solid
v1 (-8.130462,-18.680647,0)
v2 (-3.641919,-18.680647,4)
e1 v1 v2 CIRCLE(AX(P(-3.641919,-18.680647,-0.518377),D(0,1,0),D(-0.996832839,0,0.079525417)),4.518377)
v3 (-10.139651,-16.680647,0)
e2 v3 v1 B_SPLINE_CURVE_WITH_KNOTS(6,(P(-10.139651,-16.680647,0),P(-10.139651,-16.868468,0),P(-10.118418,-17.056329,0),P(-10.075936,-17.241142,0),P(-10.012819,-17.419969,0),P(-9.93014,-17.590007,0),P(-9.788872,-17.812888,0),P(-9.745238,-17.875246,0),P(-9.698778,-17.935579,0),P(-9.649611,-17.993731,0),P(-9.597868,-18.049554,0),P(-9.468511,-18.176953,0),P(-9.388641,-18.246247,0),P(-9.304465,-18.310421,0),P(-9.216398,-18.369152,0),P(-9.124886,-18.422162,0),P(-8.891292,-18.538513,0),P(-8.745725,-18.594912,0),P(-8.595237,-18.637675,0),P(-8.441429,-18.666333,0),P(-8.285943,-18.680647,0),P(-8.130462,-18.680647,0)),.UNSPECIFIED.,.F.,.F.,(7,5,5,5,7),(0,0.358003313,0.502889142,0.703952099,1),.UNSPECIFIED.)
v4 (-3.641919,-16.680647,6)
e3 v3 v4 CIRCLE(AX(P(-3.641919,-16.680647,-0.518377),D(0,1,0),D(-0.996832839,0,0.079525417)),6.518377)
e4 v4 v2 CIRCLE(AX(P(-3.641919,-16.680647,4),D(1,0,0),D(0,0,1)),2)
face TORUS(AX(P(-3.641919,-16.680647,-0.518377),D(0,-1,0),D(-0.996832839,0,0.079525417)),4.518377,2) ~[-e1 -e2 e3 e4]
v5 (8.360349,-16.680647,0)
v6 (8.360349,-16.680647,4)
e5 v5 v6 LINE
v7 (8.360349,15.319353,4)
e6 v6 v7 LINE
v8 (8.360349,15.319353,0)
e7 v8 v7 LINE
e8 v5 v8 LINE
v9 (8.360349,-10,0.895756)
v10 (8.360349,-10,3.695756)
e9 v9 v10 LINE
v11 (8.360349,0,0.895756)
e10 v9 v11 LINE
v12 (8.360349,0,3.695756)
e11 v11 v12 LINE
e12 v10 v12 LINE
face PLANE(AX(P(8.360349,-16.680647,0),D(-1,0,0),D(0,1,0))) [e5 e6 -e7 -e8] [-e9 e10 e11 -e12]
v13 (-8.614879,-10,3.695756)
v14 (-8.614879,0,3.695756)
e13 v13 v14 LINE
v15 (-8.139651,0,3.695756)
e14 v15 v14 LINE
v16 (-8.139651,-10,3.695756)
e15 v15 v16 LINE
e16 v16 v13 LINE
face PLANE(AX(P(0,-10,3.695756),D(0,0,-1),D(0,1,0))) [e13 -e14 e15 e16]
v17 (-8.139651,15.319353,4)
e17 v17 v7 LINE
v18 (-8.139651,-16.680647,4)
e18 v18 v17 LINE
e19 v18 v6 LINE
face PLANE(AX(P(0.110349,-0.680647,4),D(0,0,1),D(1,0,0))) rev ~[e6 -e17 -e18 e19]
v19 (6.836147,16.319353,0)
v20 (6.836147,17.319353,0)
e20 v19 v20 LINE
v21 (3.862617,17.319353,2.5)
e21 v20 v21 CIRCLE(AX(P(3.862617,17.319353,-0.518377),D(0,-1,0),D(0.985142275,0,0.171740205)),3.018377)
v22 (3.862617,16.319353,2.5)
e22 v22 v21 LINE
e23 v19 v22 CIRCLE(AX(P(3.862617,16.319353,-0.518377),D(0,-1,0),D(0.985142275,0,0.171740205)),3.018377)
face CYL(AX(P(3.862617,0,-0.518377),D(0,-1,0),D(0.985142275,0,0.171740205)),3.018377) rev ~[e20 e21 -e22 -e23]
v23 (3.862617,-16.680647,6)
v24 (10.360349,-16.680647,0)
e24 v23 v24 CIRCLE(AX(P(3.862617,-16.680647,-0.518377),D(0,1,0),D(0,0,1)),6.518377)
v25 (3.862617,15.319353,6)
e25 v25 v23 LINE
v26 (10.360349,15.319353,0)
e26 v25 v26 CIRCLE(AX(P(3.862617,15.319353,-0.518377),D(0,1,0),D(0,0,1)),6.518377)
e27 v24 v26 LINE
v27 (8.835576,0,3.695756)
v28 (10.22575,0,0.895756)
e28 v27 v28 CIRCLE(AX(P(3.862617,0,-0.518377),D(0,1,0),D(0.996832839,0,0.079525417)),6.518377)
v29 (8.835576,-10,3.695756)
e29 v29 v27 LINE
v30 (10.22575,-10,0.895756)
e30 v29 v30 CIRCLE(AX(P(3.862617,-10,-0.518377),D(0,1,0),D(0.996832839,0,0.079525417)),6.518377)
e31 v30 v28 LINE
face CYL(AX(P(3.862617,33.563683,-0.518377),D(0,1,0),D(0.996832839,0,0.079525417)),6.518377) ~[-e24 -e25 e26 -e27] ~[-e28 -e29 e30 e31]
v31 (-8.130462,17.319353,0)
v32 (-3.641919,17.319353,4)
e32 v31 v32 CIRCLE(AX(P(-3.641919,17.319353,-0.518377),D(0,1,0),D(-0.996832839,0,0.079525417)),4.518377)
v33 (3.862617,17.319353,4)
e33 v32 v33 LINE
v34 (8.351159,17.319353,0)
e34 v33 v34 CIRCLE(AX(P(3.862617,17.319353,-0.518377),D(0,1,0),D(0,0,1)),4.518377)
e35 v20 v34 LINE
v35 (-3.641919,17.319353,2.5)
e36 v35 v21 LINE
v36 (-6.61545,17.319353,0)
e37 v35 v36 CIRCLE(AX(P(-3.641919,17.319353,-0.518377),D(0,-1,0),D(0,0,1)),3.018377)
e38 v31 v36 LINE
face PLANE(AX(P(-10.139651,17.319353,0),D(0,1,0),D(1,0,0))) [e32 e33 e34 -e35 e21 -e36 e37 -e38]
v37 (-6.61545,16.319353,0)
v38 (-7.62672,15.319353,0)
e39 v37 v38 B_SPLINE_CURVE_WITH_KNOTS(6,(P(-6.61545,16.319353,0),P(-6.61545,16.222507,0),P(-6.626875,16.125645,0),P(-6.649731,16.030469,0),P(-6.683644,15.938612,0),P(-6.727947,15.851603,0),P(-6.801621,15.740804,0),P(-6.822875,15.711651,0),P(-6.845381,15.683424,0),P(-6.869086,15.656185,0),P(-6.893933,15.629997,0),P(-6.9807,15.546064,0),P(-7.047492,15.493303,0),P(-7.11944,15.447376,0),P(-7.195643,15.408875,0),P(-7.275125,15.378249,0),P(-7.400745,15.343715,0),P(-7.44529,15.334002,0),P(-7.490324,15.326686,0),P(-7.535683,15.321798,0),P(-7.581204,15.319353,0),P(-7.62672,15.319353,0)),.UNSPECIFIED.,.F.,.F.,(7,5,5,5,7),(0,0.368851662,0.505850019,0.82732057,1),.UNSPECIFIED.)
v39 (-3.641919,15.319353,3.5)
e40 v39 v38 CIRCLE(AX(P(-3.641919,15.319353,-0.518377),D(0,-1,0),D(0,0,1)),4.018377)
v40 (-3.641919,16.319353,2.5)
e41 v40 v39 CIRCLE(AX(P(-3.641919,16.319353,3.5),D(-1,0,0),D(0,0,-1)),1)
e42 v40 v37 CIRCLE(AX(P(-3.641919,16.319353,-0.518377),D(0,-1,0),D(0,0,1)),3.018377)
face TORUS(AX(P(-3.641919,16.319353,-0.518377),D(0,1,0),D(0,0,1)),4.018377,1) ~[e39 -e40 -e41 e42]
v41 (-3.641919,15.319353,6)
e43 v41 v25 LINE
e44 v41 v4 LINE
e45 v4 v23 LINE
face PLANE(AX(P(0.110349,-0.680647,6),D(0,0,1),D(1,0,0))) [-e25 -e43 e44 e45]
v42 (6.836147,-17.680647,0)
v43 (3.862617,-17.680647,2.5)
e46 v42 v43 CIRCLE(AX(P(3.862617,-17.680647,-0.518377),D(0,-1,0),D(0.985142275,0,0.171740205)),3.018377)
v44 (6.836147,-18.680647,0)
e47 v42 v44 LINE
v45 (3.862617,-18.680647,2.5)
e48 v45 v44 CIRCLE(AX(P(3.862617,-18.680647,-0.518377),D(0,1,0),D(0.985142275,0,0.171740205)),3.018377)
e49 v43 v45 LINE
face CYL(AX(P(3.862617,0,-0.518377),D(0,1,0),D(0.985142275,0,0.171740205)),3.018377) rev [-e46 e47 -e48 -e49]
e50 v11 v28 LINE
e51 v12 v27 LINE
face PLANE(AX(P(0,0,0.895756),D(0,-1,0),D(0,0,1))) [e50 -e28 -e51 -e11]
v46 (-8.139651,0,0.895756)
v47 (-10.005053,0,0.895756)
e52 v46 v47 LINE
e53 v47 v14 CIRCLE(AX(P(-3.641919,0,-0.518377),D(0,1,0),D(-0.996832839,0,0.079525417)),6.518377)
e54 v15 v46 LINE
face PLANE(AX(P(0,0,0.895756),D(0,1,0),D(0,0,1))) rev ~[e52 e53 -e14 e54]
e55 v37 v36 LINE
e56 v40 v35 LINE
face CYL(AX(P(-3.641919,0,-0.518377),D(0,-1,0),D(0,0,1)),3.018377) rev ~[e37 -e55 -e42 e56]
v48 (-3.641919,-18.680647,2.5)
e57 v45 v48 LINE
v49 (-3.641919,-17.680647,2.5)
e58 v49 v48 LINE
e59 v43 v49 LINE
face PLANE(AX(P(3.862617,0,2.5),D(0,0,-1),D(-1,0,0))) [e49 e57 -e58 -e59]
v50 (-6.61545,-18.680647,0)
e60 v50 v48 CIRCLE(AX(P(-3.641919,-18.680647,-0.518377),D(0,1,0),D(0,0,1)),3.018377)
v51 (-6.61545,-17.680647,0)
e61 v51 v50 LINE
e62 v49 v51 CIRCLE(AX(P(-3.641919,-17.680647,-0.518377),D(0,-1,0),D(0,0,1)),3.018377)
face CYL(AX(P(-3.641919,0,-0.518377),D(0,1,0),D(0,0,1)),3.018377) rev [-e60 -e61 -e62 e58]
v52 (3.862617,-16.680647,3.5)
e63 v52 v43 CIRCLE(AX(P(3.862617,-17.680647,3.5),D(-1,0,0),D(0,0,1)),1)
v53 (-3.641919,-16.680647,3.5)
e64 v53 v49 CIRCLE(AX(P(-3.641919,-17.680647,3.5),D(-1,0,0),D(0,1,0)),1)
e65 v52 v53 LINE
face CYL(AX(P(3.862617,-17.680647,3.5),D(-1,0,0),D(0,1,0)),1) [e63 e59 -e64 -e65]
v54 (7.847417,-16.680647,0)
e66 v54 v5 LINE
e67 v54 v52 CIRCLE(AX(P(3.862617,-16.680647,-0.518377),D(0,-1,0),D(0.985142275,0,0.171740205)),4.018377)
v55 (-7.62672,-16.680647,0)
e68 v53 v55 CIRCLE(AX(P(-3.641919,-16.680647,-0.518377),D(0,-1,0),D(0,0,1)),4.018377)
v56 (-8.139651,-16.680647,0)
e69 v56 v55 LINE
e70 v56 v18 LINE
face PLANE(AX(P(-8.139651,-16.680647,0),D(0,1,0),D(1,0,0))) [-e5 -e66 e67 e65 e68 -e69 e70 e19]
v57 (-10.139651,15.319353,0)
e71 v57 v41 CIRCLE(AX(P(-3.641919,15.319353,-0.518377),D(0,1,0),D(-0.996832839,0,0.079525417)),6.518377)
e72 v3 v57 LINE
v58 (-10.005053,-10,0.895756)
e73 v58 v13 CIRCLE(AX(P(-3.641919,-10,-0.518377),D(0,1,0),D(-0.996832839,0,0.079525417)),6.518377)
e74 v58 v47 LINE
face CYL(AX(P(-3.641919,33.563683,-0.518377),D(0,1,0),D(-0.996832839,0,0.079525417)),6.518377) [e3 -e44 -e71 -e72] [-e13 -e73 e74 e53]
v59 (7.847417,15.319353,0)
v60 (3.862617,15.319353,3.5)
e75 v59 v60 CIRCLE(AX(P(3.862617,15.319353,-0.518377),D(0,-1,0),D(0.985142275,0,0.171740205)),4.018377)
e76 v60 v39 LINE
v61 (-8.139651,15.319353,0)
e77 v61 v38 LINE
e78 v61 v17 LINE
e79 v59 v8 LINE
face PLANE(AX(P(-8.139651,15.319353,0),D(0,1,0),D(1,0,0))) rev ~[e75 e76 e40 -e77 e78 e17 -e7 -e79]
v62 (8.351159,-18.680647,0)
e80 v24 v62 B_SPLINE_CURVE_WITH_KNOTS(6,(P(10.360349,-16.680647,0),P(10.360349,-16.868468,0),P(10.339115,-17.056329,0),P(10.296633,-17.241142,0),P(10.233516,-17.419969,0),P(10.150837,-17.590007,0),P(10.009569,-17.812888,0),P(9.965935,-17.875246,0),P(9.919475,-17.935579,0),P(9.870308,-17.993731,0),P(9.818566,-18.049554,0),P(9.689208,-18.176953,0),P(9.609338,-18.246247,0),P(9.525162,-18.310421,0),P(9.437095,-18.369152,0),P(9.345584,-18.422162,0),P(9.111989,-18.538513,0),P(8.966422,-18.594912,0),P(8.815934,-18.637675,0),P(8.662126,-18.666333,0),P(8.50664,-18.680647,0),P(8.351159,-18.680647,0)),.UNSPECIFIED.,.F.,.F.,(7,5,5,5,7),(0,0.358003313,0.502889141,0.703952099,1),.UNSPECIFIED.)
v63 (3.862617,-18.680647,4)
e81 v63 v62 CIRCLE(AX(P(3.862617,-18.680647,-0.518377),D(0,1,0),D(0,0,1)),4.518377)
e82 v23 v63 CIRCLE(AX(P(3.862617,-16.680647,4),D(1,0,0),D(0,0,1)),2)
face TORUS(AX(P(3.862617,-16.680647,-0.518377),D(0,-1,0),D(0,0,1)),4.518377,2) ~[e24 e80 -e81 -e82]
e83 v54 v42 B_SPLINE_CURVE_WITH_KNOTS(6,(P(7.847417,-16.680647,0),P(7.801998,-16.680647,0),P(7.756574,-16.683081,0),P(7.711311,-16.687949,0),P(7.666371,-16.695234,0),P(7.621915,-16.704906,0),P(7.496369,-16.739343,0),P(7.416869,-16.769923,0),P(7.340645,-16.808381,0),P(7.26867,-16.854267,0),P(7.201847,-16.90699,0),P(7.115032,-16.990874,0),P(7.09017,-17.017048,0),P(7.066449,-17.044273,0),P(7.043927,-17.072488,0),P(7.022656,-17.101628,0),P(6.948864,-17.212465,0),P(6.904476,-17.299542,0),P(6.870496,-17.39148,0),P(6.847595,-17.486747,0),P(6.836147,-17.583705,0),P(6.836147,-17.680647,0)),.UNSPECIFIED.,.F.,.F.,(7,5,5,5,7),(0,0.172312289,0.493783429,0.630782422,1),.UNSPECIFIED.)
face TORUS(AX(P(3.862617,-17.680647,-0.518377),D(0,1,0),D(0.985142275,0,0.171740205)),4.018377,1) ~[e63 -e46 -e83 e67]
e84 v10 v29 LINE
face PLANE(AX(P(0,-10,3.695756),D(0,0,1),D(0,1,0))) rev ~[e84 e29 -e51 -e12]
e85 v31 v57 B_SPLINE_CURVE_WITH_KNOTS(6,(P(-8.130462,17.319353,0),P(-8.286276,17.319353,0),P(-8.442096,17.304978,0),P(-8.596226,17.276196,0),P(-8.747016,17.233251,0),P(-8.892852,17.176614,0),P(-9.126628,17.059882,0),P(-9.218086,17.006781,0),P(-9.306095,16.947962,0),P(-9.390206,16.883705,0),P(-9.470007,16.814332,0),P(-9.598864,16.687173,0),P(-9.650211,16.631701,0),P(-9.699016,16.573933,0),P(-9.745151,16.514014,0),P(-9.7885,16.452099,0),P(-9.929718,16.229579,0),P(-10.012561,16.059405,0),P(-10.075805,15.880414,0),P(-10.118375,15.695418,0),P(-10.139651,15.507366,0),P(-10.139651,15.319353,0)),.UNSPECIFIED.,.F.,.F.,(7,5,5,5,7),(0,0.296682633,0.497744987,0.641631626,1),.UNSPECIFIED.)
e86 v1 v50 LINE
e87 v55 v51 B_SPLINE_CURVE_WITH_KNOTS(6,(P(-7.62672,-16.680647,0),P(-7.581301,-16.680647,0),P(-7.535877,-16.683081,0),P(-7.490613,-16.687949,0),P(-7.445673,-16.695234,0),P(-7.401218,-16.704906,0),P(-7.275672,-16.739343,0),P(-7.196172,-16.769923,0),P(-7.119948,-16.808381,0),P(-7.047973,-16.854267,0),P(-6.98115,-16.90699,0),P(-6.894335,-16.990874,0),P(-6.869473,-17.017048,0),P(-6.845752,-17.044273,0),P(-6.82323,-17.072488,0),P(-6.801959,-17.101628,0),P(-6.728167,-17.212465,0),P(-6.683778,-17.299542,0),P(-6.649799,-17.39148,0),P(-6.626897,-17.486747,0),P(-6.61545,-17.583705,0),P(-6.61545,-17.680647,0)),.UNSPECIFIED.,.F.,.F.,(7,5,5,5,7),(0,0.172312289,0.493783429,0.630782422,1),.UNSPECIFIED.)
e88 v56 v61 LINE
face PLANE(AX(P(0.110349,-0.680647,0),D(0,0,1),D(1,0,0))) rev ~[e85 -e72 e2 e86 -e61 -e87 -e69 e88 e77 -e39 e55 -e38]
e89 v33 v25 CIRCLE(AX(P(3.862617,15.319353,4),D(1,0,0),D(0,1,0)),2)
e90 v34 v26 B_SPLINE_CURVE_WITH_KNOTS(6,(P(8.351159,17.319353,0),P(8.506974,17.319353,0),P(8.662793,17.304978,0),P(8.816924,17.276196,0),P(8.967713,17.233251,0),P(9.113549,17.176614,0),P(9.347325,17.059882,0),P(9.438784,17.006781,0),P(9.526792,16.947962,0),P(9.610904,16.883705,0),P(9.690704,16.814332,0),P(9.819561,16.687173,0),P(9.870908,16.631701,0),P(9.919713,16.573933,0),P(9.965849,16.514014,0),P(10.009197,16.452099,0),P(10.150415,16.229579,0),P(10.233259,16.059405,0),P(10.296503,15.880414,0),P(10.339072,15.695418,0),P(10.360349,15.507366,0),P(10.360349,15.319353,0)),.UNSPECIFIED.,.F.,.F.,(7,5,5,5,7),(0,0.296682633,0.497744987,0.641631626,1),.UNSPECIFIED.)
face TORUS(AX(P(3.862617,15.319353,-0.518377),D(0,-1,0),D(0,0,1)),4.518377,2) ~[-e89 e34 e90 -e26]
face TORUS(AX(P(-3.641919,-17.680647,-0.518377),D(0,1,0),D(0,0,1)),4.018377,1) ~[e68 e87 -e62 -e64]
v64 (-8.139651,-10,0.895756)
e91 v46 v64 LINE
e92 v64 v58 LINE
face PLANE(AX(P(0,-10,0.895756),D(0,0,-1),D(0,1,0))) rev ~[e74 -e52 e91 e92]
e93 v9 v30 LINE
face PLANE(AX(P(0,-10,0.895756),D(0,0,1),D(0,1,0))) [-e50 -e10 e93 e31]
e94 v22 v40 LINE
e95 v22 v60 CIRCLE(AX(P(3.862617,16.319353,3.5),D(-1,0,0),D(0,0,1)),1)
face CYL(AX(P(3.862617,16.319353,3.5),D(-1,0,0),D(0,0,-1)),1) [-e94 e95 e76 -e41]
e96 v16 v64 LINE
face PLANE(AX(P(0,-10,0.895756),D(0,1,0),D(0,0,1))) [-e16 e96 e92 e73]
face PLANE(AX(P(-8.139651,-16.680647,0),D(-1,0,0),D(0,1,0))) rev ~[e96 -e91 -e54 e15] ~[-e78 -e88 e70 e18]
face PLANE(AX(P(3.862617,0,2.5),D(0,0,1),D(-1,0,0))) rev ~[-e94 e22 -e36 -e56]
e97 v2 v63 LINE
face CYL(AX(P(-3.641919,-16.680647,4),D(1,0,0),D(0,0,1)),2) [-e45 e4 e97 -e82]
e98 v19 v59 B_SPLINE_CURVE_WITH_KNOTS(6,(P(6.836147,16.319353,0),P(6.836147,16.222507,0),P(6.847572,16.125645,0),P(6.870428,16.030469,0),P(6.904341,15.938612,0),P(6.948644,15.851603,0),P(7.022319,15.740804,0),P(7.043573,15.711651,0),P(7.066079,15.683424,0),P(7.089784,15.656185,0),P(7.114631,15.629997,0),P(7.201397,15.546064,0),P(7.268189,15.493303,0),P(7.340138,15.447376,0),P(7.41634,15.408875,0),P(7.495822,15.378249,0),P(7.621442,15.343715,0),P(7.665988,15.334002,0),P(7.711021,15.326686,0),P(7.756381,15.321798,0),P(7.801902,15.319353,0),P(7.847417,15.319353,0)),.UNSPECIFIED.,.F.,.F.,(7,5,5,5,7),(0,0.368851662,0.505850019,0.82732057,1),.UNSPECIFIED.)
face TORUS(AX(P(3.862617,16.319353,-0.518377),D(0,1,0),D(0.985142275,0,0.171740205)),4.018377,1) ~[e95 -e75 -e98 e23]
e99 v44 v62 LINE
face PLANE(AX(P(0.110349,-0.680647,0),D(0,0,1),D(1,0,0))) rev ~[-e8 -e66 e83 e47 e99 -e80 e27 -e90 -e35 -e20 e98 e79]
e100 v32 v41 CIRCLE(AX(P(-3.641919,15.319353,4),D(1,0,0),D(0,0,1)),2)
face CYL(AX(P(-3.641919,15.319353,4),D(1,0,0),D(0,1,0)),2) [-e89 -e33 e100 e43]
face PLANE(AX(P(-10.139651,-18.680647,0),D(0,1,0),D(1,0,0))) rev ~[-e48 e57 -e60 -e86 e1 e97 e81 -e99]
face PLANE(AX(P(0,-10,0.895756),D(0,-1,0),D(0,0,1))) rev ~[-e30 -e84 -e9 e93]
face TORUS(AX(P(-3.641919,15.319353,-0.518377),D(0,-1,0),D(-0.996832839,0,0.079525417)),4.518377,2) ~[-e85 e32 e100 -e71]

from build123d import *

# Parameters (mm, degrees)
F1_W           = 20.5
F1_H           = 36
F2_DEPTH       = 6
F0_W           = 16.5
F0_H           = 32
F3_DEPTH       = 4
F4_T1_DEPTH    = 68.4886593371
F5_R           = 2
F7_DEPTH       = 25
F7_DEPTH_BACK  = 20.4
F8_R           = 1
F9_W           = 10
F9_H           = 2.8
F10_DEPTH      = 25
F10_DEPTH_BACK = 25


# Not quite as in the source:
# - a fillet or chamfer that OpenCascade refuses, or shapes differently, is made with other operations: its cross-section is extruded or revolved along the edge and cut away or added


with BuildPart() as f2:
    # F1 (on Top) → F2 (new body)
    with BuildSketch(Plane.XY):
        with Locations((0.1103486419, -0.6806470305)):
            Rectangle(F1_W, F1_H)
    extrude(amount=F2_DEPTH)

    # F0 (on Top) → F3 (cut)
    with BuildSketch(Plane.XY):
        with Locations((0.1103486419, -0.6806470305)):
            Rectangle(F0_W, F0_H)
    extrude(amount=F3_DEPTH, mode=Mode.SUBTRACT)

    # F4: fillet of radius 6.5183766184 on 2 edges, made by hand

    # F4_s2 → F4_t1 (cut)
    with BuildSketch(Plane.XZ.offset(-33.5636826381)):
        with BuildLine():
            ThreePointArc((10.3603486419, 0), (8.2847350288, 4.270579832), (3.8626167745, 6))
            Line((3.8626167745, 6), (10.3603486419, 6))
            Line((10.3603486419, 6), (10.3603486419, 0))
        make_face()
        with BuildLine():
            ThreePointArc((-10.1396513581, 0), (-8.064037745, 4.270579832), (-3.6419194907, 6))
            Line((-3.6419194907, 6), (-10.1396513581, 6))
            Line((-10.1396513581, 6), (-10.1396513581, 0))
        make_face()
    extrude(amount=F4_T1_DEPTH, mode=Mode.SUBTRACT)

    # F5
    f5_edges = [f2.edges().sort_by_distance(p)[0] for p in [
        (0.110349, 17.319353, 6),
        (8.284735, 17.319353, 4.27058),
        (-8.064038, -18.680647, 4.27058),
        (-8.064038, 17.319353, 4.27058),
        (0.110349, -18.680647, 6),
        (8.284735, -18.680647, 4.27058),
    ]]
    fillet(f5_edges, radius=F5_R)

    # F6 (on Front) → F7 (cut, two sides)
    with BuildSketch(Plane.XZ) as f7_sk:
        with BuildLine():
            ThreePointArc((6.8361471832, 0), (5.8050304207, 1.791953799), (3.8626167745, 2.5))
            Line((3.8626167745, 2.5), (-3.6419194907, 2.5))
            ThreePointArc((-3.6419194907, 2.5), (-5.5843331369, 1.791953799), (-6.6154498995, 0))
            Line((-6.6154498995, 0), (6.8361471832, 0))
        make_face()
    extrude(amount=-F7_DEPTH, mode=Mode.SUBTRACT)
    extrude(f7_sk.sketch, amount=F7_DEPTH_BACK, mode=Mode.SUBTRACT)

    # F8
    f8_edges = [f2.edges().sort_by_distance(p)[0] for p in [
        (-5.584333, 15.319353, 1.791954),
        (0.110349, -16.680647, 2.5),
        (5.80503, 15.319353, 1.791954),
        (0.110349, 15.319353, 2.5),
        (5.80503, -16.680647, 1.791954),
        (-5.584333, -16.680647, 1.791954),
    ]]
    fillet(f8_edges, radius=F8_R)

    # F9 (on Right) → F10 (cut, two sides)
    with BuildSketch(Plane.YZ) as f10_sk:
        with Locations((-5, 2.2957557753)):
            Rectangle(F9_W, F9_H)
    extrude(amount=-F10_DEPTH, mode=Mode.SUBTRACT)
    extrude(f10_sk.sketch, amount=F10_DEPTH_BACK, mode=Mode.SUBTRACT)


solid = f2.part
